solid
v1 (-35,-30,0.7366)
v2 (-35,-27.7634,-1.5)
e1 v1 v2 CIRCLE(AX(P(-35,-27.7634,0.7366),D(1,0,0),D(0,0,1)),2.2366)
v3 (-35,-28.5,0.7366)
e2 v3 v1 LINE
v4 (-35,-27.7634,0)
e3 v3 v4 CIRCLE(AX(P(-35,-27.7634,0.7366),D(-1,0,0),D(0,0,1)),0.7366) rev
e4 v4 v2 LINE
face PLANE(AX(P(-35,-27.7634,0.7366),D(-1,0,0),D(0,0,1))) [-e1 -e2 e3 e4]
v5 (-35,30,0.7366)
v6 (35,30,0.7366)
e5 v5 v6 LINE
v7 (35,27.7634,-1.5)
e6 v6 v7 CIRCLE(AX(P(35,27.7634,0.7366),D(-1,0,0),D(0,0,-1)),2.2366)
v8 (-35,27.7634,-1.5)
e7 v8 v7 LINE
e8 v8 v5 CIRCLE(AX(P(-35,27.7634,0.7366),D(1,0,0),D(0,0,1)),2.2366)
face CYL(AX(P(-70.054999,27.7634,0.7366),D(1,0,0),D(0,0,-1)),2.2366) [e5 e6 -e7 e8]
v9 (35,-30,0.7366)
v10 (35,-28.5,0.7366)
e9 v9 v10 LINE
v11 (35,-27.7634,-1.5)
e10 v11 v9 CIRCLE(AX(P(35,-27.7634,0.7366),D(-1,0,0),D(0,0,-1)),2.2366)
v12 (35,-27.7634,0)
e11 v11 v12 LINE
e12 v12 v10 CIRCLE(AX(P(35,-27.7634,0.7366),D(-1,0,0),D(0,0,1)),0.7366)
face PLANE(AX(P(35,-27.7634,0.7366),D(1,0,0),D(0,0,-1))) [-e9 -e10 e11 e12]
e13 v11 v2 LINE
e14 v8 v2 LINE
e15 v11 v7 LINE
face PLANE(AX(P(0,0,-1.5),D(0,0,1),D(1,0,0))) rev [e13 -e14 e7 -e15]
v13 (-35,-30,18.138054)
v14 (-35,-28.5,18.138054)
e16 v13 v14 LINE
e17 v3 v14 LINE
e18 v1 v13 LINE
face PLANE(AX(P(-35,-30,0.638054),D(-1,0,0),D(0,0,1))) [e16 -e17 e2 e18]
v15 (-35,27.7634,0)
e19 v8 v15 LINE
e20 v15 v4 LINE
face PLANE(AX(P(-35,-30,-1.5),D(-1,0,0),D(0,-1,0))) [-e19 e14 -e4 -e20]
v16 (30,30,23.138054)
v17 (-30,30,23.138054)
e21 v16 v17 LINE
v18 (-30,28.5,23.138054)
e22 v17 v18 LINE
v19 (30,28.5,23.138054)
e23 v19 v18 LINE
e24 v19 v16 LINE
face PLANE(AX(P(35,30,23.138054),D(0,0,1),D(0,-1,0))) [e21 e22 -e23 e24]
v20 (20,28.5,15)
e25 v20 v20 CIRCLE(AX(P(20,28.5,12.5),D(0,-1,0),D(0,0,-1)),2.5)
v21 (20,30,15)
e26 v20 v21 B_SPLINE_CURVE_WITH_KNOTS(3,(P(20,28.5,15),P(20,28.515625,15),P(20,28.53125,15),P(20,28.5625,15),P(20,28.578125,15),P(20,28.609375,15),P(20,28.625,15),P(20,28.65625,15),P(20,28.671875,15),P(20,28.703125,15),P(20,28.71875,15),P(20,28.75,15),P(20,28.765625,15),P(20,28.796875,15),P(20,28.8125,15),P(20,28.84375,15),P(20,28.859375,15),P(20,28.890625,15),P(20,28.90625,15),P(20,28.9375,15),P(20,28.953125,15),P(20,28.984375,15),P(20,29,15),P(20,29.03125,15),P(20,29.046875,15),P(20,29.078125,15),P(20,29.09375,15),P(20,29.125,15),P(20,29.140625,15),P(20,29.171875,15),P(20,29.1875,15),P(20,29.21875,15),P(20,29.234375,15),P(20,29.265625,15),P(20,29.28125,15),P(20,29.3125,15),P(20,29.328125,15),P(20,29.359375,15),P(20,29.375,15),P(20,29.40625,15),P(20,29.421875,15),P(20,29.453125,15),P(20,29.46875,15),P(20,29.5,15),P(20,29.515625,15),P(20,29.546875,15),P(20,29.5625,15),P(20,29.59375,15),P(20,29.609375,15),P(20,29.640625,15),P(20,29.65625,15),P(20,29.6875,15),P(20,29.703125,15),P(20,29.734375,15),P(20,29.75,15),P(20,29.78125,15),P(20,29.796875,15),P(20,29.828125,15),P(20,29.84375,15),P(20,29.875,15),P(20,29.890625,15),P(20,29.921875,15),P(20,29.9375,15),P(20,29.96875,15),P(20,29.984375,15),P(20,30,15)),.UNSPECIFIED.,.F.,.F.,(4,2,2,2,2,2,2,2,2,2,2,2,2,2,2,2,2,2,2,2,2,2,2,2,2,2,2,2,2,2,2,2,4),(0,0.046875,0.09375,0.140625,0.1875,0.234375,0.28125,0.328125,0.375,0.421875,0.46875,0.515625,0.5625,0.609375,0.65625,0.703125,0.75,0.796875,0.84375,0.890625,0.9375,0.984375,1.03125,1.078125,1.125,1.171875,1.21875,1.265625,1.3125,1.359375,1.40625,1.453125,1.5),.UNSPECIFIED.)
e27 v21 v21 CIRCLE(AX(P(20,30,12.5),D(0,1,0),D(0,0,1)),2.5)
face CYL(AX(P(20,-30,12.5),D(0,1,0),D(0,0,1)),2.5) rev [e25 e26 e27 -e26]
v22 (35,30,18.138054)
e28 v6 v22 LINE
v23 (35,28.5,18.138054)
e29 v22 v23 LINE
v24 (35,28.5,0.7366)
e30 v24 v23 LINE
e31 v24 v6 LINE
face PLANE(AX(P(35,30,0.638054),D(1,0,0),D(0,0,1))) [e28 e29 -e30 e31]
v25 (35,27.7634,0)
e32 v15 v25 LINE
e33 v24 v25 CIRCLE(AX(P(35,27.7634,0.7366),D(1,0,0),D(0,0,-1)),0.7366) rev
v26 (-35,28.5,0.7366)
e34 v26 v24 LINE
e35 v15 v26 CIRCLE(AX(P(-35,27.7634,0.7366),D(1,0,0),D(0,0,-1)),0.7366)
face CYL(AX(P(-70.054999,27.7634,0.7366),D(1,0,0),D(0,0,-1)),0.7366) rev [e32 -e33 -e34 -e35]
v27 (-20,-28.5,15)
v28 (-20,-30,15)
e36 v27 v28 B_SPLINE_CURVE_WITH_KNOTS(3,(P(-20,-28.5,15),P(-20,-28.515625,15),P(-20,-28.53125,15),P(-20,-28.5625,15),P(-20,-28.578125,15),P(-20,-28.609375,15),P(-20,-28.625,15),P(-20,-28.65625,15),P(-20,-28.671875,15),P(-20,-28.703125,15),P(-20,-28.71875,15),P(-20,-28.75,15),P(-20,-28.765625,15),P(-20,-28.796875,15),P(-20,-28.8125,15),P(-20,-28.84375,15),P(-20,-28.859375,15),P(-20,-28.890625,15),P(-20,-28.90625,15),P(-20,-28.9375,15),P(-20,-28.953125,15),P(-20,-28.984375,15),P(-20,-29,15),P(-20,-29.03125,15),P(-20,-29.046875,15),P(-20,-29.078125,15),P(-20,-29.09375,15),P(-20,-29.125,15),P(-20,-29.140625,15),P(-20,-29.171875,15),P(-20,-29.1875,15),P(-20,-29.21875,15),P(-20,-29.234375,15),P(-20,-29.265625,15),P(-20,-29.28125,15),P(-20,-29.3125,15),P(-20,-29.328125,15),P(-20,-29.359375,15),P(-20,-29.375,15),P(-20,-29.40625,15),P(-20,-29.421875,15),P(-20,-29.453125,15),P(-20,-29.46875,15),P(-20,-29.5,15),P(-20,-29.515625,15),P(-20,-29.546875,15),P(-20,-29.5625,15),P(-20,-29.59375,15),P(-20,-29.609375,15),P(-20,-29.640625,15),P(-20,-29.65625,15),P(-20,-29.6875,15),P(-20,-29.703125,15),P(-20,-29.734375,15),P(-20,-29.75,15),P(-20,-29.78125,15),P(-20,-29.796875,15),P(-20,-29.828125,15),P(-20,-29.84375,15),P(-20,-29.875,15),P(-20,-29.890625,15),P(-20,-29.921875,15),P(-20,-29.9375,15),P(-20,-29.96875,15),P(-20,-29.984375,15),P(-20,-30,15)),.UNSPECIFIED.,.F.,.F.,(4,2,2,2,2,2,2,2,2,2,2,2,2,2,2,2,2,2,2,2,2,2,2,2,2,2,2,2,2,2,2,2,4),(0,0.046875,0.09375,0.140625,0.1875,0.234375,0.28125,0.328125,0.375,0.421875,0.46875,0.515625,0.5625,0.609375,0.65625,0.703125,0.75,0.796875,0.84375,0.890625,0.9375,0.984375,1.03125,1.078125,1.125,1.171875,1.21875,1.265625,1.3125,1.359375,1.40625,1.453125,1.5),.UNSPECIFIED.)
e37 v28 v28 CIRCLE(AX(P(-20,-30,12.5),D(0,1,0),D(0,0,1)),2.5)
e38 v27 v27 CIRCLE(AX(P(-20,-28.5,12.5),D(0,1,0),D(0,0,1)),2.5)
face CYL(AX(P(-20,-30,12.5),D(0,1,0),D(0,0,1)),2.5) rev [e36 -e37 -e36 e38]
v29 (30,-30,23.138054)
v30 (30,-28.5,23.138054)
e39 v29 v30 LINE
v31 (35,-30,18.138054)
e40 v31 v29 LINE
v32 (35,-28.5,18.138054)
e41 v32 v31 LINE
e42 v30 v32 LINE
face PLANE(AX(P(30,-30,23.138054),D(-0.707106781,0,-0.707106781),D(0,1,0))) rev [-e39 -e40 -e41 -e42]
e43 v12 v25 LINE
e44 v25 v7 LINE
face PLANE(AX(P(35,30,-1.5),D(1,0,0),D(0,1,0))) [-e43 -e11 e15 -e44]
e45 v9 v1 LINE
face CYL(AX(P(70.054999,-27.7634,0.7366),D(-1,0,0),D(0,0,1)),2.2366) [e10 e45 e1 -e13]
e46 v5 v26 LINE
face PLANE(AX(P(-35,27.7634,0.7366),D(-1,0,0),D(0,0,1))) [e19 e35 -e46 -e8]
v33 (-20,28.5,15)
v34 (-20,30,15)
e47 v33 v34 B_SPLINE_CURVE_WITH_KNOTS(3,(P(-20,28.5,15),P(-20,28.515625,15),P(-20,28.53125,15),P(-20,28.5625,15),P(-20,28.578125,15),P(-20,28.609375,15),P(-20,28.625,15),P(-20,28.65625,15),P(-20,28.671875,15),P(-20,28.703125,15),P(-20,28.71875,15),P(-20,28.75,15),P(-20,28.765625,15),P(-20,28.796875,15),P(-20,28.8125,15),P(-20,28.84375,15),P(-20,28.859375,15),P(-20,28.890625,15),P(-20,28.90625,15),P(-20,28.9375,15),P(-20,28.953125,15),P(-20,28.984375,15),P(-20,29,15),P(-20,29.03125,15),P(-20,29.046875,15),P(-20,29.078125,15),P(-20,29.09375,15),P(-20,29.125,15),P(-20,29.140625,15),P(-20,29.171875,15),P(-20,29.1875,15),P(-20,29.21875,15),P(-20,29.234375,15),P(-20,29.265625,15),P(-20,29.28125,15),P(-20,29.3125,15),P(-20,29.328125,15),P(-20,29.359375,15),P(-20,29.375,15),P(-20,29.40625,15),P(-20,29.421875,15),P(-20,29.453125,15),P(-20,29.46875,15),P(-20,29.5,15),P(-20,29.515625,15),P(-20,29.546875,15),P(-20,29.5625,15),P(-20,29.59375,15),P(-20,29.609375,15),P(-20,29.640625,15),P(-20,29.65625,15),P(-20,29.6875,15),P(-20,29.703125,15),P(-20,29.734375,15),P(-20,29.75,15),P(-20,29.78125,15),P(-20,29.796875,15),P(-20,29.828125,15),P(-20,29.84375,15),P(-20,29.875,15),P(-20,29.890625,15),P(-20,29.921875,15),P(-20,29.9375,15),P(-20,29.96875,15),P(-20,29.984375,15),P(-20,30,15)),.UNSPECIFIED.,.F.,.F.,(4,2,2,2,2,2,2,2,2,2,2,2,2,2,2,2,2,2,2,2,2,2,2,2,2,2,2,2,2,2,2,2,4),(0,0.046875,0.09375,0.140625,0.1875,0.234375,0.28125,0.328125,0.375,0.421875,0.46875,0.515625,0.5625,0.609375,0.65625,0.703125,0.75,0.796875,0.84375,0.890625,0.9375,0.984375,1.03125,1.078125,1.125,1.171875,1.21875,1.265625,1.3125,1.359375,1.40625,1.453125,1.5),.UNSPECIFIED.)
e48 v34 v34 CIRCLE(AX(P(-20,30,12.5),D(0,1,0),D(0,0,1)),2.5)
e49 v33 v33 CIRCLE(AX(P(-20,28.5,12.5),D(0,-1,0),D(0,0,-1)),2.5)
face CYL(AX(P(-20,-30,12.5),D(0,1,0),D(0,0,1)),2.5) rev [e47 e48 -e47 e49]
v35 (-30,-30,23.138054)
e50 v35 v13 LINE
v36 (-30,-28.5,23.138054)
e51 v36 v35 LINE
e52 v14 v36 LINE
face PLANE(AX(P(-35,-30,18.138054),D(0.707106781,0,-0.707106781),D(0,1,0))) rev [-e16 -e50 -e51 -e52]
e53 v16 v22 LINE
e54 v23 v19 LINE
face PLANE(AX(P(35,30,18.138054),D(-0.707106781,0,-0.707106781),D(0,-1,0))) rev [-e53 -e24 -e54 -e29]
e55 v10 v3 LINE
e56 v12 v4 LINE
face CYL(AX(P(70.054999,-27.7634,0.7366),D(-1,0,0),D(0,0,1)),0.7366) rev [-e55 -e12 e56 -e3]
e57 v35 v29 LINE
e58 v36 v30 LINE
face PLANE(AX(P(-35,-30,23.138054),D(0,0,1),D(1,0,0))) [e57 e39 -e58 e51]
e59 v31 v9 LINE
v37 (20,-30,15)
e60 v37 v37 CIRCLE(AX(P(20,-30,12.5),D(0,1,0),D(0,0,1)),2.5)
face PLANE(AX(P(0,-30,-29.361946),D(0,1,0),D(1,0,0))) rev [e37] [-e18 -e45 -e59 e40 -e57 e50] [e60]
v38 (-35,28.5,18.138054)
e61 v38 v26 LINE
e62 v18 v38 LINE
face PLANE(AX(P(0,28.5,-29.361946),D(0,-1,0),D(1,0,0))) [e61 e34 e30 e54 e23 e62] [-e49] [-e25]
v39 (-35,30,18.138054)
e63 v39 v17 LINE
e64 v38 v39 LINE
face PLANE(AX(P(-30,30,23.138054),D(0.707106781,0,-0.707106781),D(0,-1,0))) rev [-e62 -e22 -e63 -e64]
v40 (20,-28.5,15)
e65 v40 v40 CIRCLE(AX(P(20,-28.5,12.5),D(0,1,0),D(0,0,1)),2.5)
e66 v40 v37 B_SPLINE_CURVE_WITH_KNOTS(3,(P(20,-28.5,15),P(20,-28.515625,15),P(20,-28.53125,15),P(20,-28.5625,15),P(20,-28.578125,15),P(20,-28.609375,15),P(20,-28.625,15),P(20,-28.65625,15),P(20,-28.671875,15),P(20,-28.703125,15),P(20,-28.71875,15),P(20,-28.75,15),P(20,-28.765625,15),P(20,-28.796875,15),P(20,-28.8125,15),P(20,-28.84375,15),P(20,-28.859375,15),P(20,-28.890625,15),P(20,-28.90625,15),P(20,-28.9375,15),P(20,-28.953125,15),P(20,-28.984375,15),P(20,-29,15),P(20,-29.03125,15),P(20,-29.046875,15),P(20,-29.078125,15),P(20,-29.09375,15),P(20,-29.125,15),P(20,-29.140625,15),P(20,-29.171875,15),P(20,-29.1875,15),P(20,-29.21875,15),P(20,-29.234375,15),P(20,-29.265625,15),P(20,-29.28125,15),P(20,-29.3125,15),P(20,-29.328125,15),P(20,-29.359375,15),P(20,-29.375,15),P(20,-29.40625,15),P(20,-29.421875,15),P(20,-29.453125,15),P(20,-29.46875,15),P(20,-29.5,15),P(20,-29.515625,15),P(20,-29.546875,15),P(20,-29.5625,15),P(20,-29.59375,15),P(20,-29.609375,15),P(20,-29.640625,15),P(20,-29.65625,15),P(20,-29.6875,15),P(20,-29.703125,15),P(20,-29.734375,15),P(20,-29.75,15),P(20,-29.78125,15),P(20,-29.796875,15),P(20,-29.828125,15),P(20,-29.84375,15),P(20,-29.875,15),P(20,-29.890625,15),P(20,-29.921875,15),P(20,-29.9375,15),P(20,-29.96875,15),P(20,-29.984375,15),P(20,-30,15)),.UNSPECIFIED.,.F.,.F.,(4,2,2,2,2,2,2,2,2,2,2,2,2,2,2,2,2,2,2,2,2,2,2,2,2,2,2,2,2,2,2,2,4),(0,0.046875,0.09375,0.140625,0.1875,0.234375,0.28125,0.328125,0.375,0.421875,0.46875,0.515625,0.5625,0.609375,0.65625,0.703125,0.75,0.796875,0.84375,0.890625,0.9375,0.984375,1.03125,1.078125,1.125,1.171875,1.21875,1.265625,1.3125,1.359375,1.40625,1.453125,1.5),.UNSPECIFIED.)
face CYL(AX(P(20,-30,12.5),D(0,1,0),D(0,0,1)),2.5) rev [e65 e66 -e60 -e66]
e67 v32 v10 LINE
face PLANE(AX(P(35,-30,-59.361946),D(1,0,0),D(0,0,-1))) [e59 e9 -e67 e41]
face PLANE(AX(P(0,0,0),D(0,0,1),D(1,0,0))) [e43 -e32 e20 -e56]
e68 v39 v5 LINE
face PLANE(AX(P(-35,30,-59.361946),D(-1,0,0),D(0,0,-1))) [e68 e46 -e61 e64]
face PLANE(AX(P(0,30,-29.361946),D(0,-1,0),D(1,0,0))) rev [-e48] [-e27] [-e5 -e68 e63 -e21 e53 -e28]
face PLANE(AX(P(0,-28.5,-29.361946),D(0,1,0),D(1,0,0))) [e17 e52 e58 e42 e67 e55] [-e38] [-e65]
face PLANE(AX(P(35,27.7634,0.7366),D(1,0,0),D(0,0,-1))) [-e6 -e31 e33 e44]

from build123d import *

# Parameters (mm, degrees)
BASE_FLANGE1_DEPTH     = 1.5
SKETCHED_START         = -35
SKETCHED_BEND1_DEPTH   = 70
SKETCHED_BEND1_2_DEPTH = 70
CHAMFER1_SIZE          = 5
SKETCH7_R              = 2.5
CUT_EXTRUDE1_DEPTH     = 74.21454467


# Read off the part's stored shape, not the designer's step: Sketched Bend1
# Sheet-metal steps are written as plain solids
with BuildPart() as part:
    # Sketch1 → Base-Flange1 (new body)
    with BuildSketch(Plane(origin=(0, 0, 0), x_dir=(0, 1, 0), z_dir=(0, 0, 1))):
        Polygon((-30, -35), (30, -35), (52.5, -35), (52.5, 35), (30, 35), (-30, 35), (-52.5, 35), (-52.5, -35), align=None)
    extrude(amount=-BASE_FLANGE1_DEPTH)

    # Sketched Bend1 outline → Sketched Bend1 (cut)
    with BuildSketch(Plane.YZ.offset(SKETCHED_START)):
        with BuildLine():
            ThreePointArc((29.875223856, 0), (29.058564082, -1.086838938), (27.7634, -1.5))
            Line((27.7634, -1.5), (52.5, -1.5))
            Line((52.5, -1.5), (52.5, 0))
            Line((52.5, 0), (29.875223856, 0))
        make_face()
        with BuildLine():
            Line((-52.5, -1.5), (-27.7634, -1.5))
            ThreePointArc((-27.7634, -1.5), (-29.058564082, -1.086838938), (-29.875223856, 0))
            Line((-29.875223856, 0), (-52.5, 0))
            Line((-52.5, 0), (-52.5, -1.5))
        make_face()
    extrude(amount=SKETCHED_BEND1_DEPTH, mode=Mode.SUBTRACT)

    # Sketched Bend1 2 outline → Sketched Bend1 2 (add)
    with BuildSketch(Plane.YZ.offset(SKETCHED_START)):
        with BuildLine():
            Line((27.7634, 0), (29.875223856, 0))
            ThreePointArc((29.875223856, 0), (29.968585343, 0.363053267), (30, 0.7366))
            Line((30, 0.7366), (30, 23.138054181))
            Line((30, 23.138054181), (28.5, 23.138054181))
            Line((28.5, 23.138054181), (28.5, 0.7366))
            ThreePointArc((28.5, 0.7366), (28.284254855, 0.215745145), (27.7634, 0))
        make_face()
        with BuildLine():
            ThreePointArc((-30, 0.7366), (-29.968585343, 0.363053267), (-29.875223856, 0))
            Line((-29.875223856, 0), (-27.7634, 0))
            ThreePointArc((-27.7634, 0), (-28.284254855, 0.215745145), (-28.5, 0.7366))
            Line((-28.5, 0.7366), (-28.5, 23.138054181))
            Line((-28.5, 23.138054181), (-30, 23.138054181))
            Line((-30, 23.138054181), (-30, 0.7366))
        make_face()
    extrude(amount=SKETCHED_BEND1_2_DEPTH)

    # Chamfer1
    chamfer1_edges = [part.edges().sort_by_distance(p)[0] for p in [
        (35, -29.25, 23.138054181),
        (-35, -29.25, 23.138054181),
        (-35, 29.25, 23.138054181),
        (35, 29.25, 23.138054181),
    ]]
    chamfer(chamfer1_edges, length=CHAMFER1_SIZE)

    # Sketch7 → Cut-Extrude1 (cut, through all)
    with BuildSketch(Plane(origin=(0, 30, 0), x_dir=(-1, 0, 0), z_dir=(0, 1, 0))):
        with Locations(Location((-20, 12.5, 0), (0, 0, 90))):
            Circle(SKETCH7_R)
        with Locations(Location((20, 12.5, 0), (0, 0, 90))):
            Circle(SKETCH7_R)
    extrude(amount=-CUT_EXTRUDE1_DEPTH, mode=Mode.SUBTRACT)


solid = part.part
